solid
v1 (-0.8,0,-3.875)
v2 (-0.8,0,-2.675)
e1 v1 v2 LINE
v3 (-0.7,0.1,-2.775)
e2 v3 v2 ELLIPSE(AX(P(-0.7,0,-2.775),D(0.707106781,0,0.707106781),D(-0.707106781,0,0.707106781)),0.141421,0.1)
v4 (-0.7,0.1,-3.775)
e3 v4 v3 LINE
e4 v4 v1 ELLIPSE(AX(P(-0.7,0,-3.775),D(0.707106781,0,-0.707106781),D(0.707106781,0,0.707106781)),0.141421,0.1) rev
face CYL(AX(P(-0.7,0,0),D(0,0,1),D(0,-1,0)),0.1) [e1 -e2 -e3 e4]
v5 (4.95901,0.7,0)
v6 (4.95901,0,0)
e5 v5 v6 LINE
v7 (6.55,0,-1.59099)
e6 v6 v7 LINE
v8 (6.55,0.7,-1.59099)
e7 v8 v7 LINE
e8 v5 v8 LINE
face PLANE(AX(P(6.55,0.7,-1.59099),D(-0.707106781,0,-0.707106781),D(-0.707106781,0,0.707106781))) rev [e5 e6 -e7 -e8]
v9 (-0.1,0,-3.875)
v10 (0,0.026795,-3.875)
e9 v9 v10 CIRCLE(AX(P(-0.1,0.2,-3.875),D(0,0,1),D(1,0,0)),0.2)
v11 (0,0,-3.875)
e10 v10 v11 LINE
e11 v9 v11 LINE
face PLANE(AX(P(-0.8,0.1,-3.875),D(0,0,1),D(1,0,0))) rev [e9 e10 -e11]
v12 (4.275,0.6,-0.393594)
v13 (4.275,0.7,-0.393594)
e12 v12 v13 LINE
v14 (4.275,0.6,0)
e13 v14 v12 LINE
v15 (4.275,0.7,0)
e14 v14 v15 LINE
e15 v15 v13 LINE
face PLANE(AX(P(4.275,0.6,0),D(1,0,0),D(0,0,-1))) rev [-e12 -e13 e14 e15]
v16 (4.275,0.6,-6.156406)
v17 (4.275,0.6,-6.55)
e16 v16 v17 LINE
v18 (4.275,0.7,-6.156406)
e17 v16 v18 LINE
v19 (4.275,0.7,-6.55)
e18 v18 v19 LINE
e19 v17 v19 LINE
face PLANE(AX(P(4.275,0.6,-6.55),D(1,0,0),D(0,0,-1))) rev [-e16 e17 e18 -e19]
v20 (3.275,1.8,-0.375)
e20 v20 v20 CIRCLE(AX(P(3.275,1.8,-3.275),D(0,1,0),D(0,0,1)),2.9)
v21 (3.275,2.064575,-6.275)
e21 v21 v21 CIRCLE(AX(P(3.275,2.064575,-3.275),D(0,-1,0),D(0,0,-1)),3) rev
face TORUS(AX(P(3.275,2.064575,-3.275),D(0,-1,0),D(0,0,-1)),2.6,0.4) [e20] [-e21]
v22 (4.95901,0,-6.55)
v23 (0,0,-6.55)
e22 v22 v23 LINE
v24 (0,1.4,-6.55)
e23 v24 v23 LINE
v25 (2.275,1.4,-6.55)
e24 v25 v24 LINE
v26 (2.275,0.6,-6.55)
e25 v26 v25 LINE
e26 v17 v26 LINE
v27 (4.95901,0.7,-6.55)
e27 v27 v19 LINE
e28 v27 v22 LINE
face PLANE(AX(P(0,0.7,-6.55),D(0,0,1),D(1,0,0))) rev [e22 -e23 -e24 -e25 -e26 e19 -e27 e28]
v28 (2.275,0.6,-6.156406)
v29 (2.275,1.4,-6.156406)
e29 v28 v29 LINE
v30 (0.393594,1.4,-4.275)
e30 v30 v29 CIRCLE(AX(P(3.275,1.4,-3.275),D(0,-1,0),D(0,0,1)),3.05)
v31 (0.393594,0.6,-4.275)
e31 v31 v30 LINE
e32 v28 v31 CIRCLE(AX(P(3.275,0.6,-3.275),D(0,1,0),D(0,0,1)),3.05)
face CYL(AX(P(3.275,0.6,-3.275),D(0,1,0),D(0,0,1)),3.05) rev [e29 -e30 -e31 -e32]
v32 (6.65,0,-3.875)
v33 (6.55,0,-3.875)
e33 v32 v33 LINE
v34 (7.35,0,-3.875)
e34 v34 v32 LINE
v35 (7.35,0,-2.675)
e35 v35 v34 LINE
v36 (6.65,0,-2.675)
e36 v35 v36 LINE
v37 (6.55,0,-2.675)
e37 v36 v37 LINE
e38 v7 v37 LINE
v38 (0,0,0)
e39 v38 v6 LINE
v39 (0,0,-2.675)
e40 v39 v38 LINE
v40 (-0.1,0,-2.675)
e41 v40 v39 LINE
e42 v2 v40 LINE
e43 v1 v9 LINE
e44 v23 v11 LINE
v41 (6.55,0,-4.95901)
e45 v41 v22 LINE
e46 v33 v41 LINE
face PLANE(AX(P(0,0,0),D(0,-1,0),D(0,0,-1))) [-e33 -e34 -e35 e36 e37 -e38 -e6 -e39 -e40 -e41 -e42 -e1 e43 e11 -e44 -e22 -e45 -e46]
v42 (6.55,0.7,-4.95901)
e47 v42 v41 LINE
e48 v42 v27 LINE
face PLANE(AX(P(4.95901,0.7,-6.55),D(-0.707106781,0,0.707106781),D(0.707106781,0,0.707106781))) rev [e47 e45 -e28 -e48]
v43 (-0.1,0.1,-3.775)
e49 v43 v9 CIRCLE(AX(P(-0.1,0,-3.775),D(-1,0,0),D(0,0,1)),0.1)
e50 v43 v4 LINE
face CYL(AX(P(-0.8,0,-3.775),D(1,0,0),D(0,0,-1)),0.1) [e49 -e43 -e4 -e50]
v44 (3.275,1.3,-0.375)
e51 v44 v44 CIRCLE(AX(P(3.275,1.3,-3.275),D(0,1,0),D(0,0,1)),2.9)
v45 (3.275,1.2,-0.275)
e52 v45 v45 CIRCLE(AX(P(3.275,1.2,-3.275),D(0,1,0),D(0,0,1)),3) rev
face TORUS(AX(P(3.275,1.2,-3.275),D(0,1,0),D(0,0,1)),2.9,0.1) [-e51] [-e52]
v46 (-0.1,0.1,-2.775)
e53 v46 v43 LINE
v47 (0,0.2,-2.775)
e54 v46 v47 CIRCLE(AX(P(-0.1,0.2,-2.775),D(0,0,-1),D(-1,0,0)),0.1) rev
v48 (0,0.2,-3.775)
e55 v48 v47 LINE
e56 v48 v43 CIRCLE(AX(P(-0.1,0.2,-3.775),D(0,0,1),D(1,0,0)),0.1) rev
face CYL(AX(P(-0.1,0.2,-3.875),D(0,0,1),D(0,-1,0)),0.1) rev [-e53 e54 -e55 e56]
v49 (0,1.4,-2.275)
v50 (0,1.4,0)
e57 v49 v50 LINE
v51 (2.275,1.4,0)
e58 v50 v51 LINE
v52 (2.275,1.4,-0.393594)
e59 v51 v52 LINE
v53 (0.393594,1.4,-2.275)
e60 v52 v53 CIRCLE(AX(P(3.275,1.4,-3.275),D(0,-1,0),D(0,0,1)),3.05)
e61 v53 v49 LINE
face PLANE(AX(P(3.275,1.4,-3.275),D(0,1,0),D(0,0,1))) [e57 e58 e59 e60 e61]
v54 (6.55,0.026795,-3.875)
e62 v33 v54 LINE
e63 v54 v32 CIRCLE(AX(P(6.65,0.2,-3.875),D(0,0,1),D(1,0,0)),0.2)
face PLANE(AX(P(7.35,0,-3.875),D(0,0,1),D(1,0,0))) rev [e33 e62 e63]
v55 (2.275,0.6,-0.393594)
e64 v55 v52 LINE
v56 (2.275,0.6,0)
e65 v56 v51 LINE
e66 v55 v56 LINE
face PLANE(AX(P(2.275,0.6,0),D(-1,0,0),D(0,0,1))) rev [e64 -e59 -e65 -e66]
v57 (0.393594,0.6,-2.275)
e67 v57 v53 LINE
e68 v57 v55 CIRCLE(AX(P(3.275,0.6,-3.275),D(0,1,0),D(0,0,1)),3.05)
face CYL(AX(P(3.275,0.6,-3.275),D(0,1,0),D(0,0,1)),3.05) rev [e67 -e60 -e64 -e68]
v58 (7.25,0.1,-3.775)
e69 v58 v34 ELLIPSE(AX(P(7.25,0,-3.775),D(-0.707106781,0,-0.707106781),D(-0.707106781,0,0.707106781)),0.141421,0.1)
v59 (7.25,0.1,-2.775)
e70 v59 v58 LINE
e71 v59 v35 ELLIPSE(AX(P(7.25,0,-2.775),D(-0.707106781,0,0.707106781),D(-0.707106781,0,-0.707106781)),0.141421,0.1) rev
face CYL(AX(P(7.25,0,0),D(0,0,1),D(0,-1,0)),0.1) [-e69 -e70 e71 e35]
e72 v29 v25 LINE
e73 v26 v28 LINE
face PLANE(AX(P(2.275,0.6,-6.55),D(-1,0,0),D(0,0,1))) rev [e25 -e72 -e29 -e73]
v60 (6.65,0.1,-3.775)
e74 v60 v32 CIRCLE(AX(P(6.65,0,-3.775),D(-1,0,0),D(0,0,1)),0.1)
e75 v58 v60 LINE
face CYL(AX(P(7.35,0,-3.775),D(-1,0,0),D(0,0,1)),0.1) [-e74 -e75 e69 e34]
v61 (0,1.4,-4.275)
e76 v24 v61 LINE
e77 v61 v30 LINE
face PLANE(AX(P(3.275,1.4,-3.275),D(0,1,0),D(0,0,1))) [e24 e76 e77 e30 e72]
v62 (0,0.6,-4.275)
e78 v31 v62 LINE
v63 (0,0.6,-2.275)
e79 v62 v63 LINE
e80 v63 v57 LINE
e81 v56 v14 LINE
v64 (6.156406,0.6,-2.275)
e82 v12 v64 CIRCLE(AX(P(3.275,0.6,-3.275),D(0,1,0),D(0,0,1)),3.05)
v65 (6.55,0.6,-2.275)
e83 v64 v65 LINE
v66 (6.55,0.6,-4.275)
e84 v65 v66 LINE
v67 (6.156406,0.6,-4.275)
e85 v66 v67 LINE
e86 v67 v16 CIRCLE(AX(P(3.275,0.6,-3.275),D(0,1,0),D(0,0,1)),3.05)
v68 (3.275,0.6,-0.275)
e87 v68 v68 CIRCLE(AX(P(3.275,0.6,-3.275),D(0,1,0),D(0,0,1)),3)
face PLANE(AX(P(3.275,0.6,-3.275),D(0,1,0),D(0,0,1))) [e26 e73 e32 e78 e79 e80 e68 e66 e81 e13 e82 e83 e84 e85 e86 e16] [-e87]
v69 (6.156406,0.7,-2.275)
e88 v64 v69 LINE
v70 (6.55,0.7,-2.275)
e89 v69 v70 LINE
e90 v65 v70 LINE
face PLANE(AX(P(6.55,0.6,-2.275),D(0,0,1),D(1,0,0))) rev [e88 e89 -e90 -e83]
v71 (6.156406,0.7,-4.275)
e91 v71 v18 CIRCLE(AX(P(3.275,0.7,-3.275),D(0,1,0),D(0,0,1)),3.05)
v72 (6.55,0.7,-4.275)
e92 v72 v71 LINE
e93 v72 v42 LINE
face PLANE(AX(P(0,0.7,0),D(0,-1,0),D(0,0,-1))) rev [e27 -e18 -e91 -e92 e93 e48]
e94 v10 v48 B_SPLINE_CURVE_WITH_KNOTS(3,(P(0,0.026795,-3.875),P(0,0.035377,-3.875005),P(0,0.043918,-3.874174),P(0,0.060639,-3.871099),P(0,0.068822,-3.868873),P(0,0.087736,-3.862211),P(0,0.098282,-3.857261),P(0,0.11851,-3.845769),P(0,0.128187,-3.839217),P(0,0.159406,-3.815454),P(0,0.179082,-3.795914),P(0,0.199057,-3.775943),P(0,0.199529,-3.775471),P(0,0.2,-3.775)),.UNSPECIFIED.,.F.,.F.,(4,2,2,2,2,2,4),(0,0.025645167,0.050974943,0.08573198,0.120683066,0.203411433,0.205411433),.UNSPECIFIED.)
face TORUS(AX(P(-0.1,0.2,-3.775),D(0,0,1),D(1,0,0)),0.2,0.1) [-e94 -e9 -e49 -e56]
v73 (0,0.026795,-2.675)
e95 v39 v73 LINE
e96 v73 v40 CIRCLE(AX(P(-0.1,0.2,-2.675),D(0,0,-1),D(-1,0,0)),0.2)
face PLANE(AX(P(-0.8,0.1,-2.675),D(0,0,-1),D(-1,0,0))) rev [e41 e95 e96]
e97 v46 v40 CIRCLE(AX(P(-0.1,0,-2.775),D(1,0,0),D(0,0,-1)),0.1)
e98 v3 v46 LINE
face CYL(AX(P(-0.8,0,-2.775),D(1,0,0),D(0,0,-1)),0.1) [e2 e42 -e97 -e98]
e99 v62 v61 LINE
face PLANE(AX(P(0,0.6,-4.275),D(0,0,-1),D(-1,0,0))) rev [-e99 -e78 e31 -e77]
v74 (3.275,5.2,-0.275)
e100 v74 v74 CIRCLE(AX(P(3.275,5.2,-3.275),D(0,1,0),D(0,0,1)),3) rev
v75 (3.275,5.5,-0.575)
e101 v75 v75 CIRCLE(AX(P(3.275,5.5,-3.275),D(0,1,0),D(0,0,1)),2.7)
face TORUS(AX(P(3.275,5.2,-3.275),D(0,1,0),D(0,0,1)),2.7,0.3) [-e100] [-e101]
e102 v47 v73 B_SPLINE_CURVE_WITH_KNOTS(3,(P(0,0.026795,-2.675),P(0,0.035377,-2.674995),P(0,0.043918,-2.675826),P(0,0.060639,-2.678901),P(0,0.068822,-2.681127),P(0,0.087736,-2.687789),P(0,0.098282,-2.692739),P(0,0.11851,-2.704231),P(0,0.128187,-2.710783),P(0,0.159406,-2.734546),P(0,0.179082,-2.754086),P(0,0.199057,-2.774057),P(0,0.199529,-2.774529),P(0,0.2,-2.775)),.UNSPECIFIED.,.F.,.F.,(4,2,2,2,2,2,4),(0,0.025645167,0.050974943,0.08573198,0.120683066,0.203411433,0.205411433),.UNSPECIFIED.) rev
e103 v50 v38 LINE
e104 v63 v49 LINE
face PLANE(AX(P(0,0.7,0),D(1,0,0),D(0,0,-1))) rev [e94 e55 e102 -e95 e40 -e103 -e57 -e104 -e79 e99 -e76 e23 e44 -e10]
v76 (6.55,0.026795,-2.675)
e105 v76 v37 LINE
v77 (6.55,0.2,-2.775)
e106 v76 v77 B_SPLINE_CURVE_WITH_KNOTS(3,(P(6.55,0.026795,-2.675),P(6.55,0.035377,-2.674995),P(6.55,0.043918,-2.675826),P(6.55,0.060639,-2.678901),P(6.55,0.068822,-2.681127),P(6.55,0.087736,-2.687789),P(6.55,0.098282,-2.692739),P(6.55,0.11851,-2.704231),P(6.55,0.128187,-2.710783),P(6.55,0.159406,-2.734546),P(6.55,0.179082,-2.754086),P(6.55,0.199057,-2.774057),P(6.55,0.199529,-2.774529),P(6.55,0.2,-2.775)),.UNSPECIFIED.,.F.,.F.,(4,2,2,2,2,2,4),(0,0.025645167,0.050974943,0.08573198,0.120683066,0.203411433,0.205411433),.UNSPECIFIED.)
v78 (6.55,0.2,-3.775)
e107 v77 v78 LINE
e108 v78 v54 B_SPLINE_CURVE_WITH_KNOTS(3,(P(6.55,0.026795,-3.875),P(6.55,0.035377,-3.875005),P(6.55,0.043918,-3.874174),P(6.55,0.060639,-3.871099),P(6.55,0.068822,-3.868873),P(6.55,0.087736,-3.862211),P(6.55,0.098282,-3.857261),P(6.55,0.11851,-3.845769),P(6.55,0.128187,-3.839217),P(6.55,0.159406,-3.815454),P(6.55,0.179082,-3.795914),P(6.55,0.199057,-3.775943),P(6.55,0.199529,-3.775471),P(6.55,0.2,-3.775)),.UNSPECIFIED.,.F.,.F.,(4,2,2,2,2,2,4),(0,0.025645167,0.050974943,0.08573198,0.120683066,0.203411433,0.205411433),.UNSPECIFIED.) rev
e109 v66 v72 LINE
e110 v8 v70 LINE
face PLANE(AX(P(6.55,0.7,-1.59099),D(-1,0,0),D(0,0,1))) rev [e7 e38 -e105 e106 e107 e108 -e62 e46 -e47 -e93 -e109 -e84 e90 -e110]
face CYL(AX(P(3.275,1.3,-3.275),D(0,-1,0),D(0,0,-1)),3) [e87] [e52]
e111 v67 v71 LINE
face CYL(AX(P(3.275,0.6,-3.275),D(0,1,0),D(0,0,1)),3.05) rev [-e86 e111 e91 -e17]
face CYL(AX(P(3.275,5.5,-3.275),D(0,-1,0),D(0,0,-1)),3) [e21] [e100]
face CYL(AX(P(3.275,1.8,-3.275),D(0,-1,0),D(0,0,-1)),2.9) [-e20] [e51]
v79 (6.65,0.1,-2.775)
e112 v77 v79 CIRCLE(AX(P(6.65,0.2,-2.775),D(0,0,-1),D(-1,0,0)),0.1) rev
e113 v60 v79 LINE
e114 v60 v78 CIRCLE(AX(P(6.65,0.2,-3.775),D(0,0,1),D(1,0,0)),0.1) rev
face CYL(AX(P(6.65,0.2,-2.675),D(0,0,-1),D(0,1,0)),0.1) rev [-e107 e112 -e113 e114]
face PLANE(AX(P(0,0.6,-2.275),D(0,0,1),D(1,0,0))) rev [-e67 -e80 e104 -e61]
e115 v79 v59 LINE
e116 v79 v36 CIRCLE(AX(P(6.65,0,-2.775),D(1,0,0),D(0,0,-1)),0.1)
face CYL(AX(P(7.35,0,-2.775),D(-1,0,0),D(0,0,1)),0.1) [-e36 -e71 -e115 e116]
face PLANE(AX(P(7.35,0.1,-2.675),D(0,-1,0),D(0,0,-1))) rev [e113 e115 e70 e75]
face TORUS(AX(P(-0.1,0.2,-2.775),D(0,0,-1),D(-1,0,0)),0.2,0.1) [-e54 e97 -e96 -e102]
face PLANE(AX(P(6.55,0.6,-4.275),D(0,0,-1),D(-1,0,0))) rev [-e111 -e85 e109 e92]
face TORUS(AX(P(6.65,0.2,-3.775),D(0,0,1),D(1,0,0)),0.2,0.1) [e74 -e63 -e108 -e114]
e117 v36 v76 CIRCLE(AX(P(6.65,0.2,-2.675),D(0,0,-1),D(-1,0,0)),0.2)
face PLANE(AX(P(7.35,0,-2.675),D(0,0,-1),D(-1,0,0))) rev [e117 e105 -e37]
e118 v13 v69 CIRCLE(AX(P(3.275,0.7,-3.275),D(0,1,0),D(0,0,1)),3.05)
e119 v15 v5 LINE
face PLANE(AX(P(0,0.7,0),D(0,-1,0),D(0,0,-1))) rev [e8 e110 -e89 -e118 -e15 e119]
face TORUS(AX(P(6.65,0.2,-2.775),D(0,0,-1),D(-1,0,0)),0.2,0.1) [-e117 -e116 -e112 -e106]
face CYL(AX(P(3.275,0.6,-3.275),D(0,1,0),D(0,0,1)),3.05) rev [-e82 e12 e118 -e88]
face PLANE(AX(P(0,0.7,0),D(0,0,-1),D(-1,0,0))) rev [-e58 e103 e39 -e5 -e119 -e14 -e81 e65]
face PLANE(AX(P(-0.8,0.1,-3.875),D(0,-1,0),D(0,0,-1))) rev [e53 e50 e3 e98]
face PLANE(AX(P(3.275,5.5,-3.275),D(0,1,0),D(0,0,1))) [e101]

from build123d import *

# Parameters (mm, degrees)
BOSS_EXTRU_1_DEPTH      = 0.7
ENL_V_MAT_EXTRU_1_DEPTH = 0.1
BOSS_EXTRU_2_START      = 0.7
BOSS_EXTRU_2_DEPTH      = 0.7
ESQUISSE4_R             = 3
BOSS_EXTRU_3_DEPTH      = 0.7
CONG_1_R                = 0.1
ESQUISSE5_R             = 2.9
BOSS_EXTRU_4_DEPTH      = 0.5
ESQUISSE6_R             = 3
BOSS_EXTRU_5_DEPTH      = 3.7
CONG_2_R                = 0.4
CONG_3_R                = 0.3
ESQUISSE7_W             = 1.2
ESQUISSE7_H             = 0.1
BOSS_EXTRU_6_DEPTH      = 0.8
CONG_4_R                = 0.1
CONG_5_R                = 0.1
ESQUISSE8_W             = 1.2
ESQUISSE8_H             = 0.1
BOSS_EXTRU_7_DEPTH      = 0.8
CONG_6_R                = 0.1
CONG_7_R                = 0.1


with BuildPart() as part:
    # Esquisse1 → Boss.-Extru.1 (new body)
    with BuildSketch(Plane(origin=(0, 0, 0), x_dir=(1, 0, 0), z_dir=(0, 1, 0))):
        Polygon((4.959009742, 6.55), (6.55, 4.959009742), (6.55, 1.590990258), (4.959009742, 0), (0, 0), (0, 6.55), align=None)
    extrude(amount=BOSS_EXTRU_1_DEPTH)

    # Esquisse2 → Enlèv. mat.-Extru.1 (cut)
    with BuildSketch(Plane(origin=(0, 0.7, 0), x_dir=(1, 0, 0), z_dir=(0, 1, 0))):
        with BuildLine():
            Line((2.275, 6.55), (4.275, 6.55))
            Line((4.275, 6.55), (4.275, 6.156405907))
            ThreePointArc((4.275, 6.156405907), (5.431675683, 5.431675683), (6.156405907, 4.275))
            Line((6.156405907, 4.275), (6.55, 4.275))
            Line((6.55, 4.275), (6.55, 2.275))
            Line((6.55, 2.275), (6.156405907, 2.275))
            ThreePointArc((6.156405907, 2.275), (5.431675683, 1.118324317), (4.275, 0.393594093))
            Line((4.275, 0.393594093), (4.275, 0))
            Line((4.275, 0), (2.275, 0))
            Line((2.275, 0), (2.275, 0.393594093))
            ThreePointArc((2.275, 0.393594093), (1.118324317, 1.118324317), (0.393594093, 2.275))
            Line((0.393594093, 2.275), (0, 2.275))
            Line((0, 2.275), (0, 4.275))
            Line((0, 4.275), (0.393594093, 4.275))
            ThreePointArc((0.393594093, 4.275), (1.118324317, 5.431675683), (2.275, 6.156405907))
            Line((2.275, 6.156405907), (2.275, 6.55))
        make_face()
    extrude(amount=-ENL_V_MAT_EXTRU_1_DEPTH, mode=Mode.SUBTRACT)

    # Esquisse3 → Boss.-Extru.2 (add)
    with BuildSketch(Plane(origin=(0, 0.7, 0), x_dir=(1, 0, 0), z_dir=(0, 1, 0)).offset(BOSS_EXTRU_2_START)):
        with BuildLine():
            Line((0, 0), (2.275, 0))
            Line((2.275, 0), (2.275, 0.393594093))
            ThreePointArc((2.275, 0.393594093), (1.118324317, 1.118324317), (0.393594093, 2.275))
            Line((0.393594093, 2.275), (0, 2.275))
            Line((0, 2.275), (0, 0))
        make_face()
        with BuildLine():
            Line((0, 6.55), (0, 4.275))
            Line((0, 4.275), (0.393594093, 4.275))
            ThreePointArc((0.393594093, 4.275), (1.118324317, 5.431675683), (2.275, 6.156405907))
            Line((2.275, 6.156405907), (2.275, 6.55))
            Line((2.275, 6.55), (0, 6.55))
        make_face()
    extrude(amount=-BOSS_EXTRU_2_DEPTH)

    # Esquisse4 → Boss.-Extru.3 (add)
    with BuildSketch(Plane(origin=(0, 0.6, 0), x_dir=(1, 0, 0), z_dir=(0, 1, 0))):
        with Locations(Location((3.275, 3.275, 0), (0, 0, 270))):
            Circle(ESQUISSE4_R)
    extrude(amount=BOSS_EXTRU_3_DEPTH)

    # Congé1
    cong_1_edges = [part.edges().sort_by_distance(p)[0] for p in [
        (3.275, 1.3, -6.275),
    ]]
    fillet(cong_1_edges, radius=CONG_1_R)

    # Esquisse5 → Boss.-Extru.4 (add)
    with BuildSketch(Plane(origin=(0, 1.3, 0), x_dir=(1, 0, 0), z_dir=(0, 1, 0))):
        with Locations(Location((3.275, 3.275, 0), (0, 0, 270))):
            Circle(ESQUISSE5_R)
    extrude(amount=BOSS_EXTRU_4_DEPTH)

    # Esquisse6 → Boss.-Extru.5 (add)
    with BuildSketch(Plane(origin=(0, 1.8, 0), x_dir=(1, 0, 0), z_dir=(0, 1, 0))):
        with Locations(Location((3.275, 3.275, 0), (0, 0, 270))):
            Circle(ESQUISSE6_R)
    extrude(amount=BOSS_EXTRU_5_DEPTH)

    # Congé2
    # the kernel refuses this fillet: 0.4 mm, written as the material it takes off along each edge
    with BuildSketch(Plane(origin=(3.275, 1.8, -3.275), x_dir=(0, 0, 1), z_dir=(-1, 0, 0))) as cong_2_piece_1:
        with BuildLine():
            CenterArc((2.6, 0.264575131), CONG_2_R, 318.590377891, 41.409622109)
            Line((2.9, 0), (2.906, -0.005291503))
            ThreePointArc((2.906, -0.005291503), (2.95, -0.008), (3, -0.008))
            Line((3, -0.008), (3.008, 0))
            Line((3.008, 0), (3.008, 0.264575131))
            Line((3.008, 0.264575131), (3, 0.264575131))
        make_face()
    revolve(axis=Axis((3.275, 1.8, -3.275), (0, 1, 0)), mode=Mode.SUBTRACT)

    # Congé3
    cong_3_edges = [part.edges().sort_by_distance(p)[0] for p in [
        (3.275, 5.5, -6.275),
    ]]
    fillet(cong_3_edges, radius=CONG_3_R)

    # Esquisse7 → Boss.-Extru.6 (add)
    with BuildSketch(Plane(origin=(6.55, 0, 0), x_dir=(0, 0, -1), z_dir=(1, 0, 0))):
        with Locations((3.275, 0.05)):
            Rectangle(ESQUISSE7_W, ESQUISSE7_H)
    extrude(amount=BOSS_EXTRU_6_DEPTH)

    # Congé4
    cong_4_edges = [part.edges().sort_by_distance(p)[0] for p in [
        (6.55, 0.1, -3.275),
    ]]
    fillet(cong_4_edges, radius=CONG_4_R)

    # Congé5
    # the kernel refuses this fillet: 0.1 mm, written as the material it takes off along each edge
    with BuildSketch(Plane(origin=(6.65, 0.2, -3.875), x_dir=(0.8017442392976484, 0.5976672776328275, 0), z_dir=(0.5976672776328275, -0.8017442392976484, 0))) as cong_5_piece_1_section:
        with BuildLine():
            CenterArc((0.1 + CONG_5_R, CONG_5_R), CONG_5_R, 180, 90)
            Line((0.1 + CONG_5_R, 0), (0.1, 0))
            Line((0.1, 0), (0.1, CONG_5_R))
        make_face()
    cong_5_piece_1 = revolve(axis=Axis((6.65, 0.2, -3.875), (0, 0, 1)), revolution_arc=233.296989237, mode=Mode.PRIVATE)
    cong_5_piece_1 = split(cong_5_piece_1, bisect_by=Plane(origin=(6.55, 0.125006103, -3.843837174), z_dir=(1, 0, 0)), keep=Keep.TOP, mode=Mode.PRIVATE)
    add(cong_5_piece_1, mode=Mode.SUBTRACT)
    with BuildSketch(Plane(origin=(6.65, 0.2, -2.675), x_dir=(0.8017442392976484, 0.5976672776328275, 0), z_dir=(0.5976672776328275, -0.8017442392976484, 0))) as cong_5_piece_2_section:
        with BuildLine():
            CenterArc((0.1 + CONG_5_R, -CONG_5_R), CONG_5_R, 90, 90)
            Line((0.1 + CONG_5_R, 0), (0.1, 0))
            Line((0.1, 0), (0.1, -CONG_5_R))
        make_face()
    cong_5_piece_2 = revolve(axis=Axis((6.65, 0.2, -2.675), (0, 0, 1)), revolution_arc=233.296989237, mode=Mode.PRIVATE)
    cong_5_piece_2 = split(cong_5_piece_2, bisect_by=Plane(origin=(6.55, 0.125006105, -2.706162828), z_dir=(1, 0, 0)), keep=Keep.TOP, mode=Mode.PRIVATE)
    add(cong_5_piece_2, mode=Mode.SUBTRACT)
    with BuildSketch(Plane(origin=(7.35, 0.1, -4.125), x_dir=(-1, 0, 0), z_dir=(0, 0, 1))) as cong_5_piece_3:
        with BuildLine():
            CenterArc((CONG_5_R, CONG_5_R), CONG_5_R, 180, 90)
            Line((0, CONG_5_R), (0, 0))
            Line((0, 0), (CONG_5_R, 0))
        make_face()
    extrude(amount=1.7, mode=Mode.SUBTRACT)
    with BuildSketch(Plane(origin=(6.65, 0.1, -3.875), x_dir=(0, 0, 1), z_dir=(1, 0, 0))) as cong_5_piece_4:
        with BuildLine():
            CenterArc((CONG_5_R, CONG_5_R), CONG_5_R, 180, 90)
            Line((0, CONG_5_R), (0, 0))
            Line((0, 0), (CONG_5_R, 0))
        make_face()
    extrude(amount=0.95, mode=Mode.SUBTRACT)
    with BuildSketch(Plane(origin=(6.65, 0.1, -2.675), x_dir=(0, 0, -1), z_dir=(1, 0, 0))) as cong_5_piece_5:
        with BuildLine():
            CenterArc((CONG_5_R, -CONG_5_R), CONG_5_R, 90, 90)
            Line((0, -CONG_5_R), (0, 0))
            Line((0, 0), (CONG_5_R, 0))
        make_face()
    extrude(amount=0.95, mode=Mode.SUBTRACT)

    # Esquisse8 → Boss.-Extru.7 (add)
    with BuildSketch(Plane.ZY):
        with Locations((-3.275, 0.05)):
            Rectangle(ESQUISSE8_W, ESQUISSE8_H)
    extrude(amount=BOSS_EXTRU_7_DEPTH)

    # Congé6
    cong_6_edges = [part.edges().sort_by_distance(p)[0] for p in [
        (0, 0.1, -3.275),
    ]]
    fillet(cong_6_edges, radius=CONG_6_R)

    # Congé7
    # the kernel refuses this fillet: 0.1 mm, written as the material it takes off along each edge
    with BuildSketch(Plane(origin=(-0.1, 0.2, -2.675), x_dir=(-0.8017442392976492, 0.5976672776328262, 0), z_dir=(-0.5976672776328262, -0.8017442392976492, 0))) as cong_7_piece_1_section:
        with BuildLine():
            CenterArc((0.1 + CONG_7_R, CONG_7_R), CONG_7_R, 180, 90)
            Line((0.1, CONG_7_R), (0.1, 0))
            Line((0.1, 0), (0.1 + CONG_7_R, 0))
        make_face()
    cong_7_piece_1 = revolve(axis=Axis((-0.1, 0.2, -2.675), (0, 0, -1)), revolution_arc=233.296989237, mode=Mode.PRIVATE)
    cong_7_piece_1 = split(cong_7_piece_1, bisect_by=Plane(origin=(0, 0.125006101, -2.706162827), z_dir=(-1, 0, 0)), keep=Keep.TOP, mode=Mode.PRIVATE)
    add(cong_7_piece_1, mode=Mode.SUBTRACT)
    with BuildSketch(Plane(origin=(-0.1, 0.2, -3.875), x_dir=(-0.801744239297649, 0.5976672776328265, 0), z_dir=(-0.5976672776328265, -0.801744239297649, 0))) as cong_7_piece_2_section:
        with BuildLine():
            CenterArc((0.1 + CONG_7_R, -CONG_7_R), CONG_7_R, 90, 90)
            Line((0.1 + CONG_7_R, 0), (0.1, 0))
            Line((0.1, 0), (0.1, -CONG_7_R))
        make_face()
    cong_7_piece_2 = revolve(axis=Axis((-0.1, 0.2, -3.875), (0, 0, -1)), revolution_arc=233.296989237, mode=Mode.PRIVATE)
    cong_7_piece_2 = split(cong_7_piece_2, bisect_by=Plane(origin=(0, 0.125006106, -3.843837173), z_dir=(-1, 0, 0)), keep=Keep.TOP, mode=Mode.PRIVATE)
    add(cong_7_piece_2, mode=Mode.SUBTRACT)
    with BuildSketch(Plane(origin=(-0.1, 0.1, -2.675), x_dir=(0, 0, -1), z_dir=(-1, 0, 0))) as cong_7_piece_3:
        with BuildLine():
            CenterArc((CONG_7_R, CONG_7_R), CONG_7_R, 180, 90)
            Line((0, CONG_7_R), (0, 0))
            Line((0, 0), (CONG_7_R, 0))
        make_face()
    extrude(amount=0.95, mode=Mode.SUBTRACT)
    with BuildSketch(Plane(origin=(-0.8, 0.1, -4.125), x_dir=(0, -1, 0), z_dir=(0, 0, 1))) as cong_7_piece_4:
        with BuildLine():
            CenterArc((CONG_7_R, CONG_7_R), CONG_7_R, 180, 90)
            Line((0, CONG_7_R), (0, 0))
            Line((0, 0), (CONG_7_R, 0))
        make_face()
    extrude(amount=1.7, mode=Mode.SUBTRACT)
    with BuildSketch(Plane(origin=(-0.1, 0.1, -3.875), x_dir=(0, 0, 1), z_dir=(-1, 0, 0))) as cong_7_piece_5:
        with BuildLine():
            CenterArc((CONG_7_R, -CONG_7_R), CONG_7_R, 90, 90)
            Line((0, -CONG_7_R), (0, 0))
            Line((0, 0), (CONG_7_R, 0))
        make_face()
    extrude(amount=0.95, mode=Mode.SUBTRACT)


solid = part.part
